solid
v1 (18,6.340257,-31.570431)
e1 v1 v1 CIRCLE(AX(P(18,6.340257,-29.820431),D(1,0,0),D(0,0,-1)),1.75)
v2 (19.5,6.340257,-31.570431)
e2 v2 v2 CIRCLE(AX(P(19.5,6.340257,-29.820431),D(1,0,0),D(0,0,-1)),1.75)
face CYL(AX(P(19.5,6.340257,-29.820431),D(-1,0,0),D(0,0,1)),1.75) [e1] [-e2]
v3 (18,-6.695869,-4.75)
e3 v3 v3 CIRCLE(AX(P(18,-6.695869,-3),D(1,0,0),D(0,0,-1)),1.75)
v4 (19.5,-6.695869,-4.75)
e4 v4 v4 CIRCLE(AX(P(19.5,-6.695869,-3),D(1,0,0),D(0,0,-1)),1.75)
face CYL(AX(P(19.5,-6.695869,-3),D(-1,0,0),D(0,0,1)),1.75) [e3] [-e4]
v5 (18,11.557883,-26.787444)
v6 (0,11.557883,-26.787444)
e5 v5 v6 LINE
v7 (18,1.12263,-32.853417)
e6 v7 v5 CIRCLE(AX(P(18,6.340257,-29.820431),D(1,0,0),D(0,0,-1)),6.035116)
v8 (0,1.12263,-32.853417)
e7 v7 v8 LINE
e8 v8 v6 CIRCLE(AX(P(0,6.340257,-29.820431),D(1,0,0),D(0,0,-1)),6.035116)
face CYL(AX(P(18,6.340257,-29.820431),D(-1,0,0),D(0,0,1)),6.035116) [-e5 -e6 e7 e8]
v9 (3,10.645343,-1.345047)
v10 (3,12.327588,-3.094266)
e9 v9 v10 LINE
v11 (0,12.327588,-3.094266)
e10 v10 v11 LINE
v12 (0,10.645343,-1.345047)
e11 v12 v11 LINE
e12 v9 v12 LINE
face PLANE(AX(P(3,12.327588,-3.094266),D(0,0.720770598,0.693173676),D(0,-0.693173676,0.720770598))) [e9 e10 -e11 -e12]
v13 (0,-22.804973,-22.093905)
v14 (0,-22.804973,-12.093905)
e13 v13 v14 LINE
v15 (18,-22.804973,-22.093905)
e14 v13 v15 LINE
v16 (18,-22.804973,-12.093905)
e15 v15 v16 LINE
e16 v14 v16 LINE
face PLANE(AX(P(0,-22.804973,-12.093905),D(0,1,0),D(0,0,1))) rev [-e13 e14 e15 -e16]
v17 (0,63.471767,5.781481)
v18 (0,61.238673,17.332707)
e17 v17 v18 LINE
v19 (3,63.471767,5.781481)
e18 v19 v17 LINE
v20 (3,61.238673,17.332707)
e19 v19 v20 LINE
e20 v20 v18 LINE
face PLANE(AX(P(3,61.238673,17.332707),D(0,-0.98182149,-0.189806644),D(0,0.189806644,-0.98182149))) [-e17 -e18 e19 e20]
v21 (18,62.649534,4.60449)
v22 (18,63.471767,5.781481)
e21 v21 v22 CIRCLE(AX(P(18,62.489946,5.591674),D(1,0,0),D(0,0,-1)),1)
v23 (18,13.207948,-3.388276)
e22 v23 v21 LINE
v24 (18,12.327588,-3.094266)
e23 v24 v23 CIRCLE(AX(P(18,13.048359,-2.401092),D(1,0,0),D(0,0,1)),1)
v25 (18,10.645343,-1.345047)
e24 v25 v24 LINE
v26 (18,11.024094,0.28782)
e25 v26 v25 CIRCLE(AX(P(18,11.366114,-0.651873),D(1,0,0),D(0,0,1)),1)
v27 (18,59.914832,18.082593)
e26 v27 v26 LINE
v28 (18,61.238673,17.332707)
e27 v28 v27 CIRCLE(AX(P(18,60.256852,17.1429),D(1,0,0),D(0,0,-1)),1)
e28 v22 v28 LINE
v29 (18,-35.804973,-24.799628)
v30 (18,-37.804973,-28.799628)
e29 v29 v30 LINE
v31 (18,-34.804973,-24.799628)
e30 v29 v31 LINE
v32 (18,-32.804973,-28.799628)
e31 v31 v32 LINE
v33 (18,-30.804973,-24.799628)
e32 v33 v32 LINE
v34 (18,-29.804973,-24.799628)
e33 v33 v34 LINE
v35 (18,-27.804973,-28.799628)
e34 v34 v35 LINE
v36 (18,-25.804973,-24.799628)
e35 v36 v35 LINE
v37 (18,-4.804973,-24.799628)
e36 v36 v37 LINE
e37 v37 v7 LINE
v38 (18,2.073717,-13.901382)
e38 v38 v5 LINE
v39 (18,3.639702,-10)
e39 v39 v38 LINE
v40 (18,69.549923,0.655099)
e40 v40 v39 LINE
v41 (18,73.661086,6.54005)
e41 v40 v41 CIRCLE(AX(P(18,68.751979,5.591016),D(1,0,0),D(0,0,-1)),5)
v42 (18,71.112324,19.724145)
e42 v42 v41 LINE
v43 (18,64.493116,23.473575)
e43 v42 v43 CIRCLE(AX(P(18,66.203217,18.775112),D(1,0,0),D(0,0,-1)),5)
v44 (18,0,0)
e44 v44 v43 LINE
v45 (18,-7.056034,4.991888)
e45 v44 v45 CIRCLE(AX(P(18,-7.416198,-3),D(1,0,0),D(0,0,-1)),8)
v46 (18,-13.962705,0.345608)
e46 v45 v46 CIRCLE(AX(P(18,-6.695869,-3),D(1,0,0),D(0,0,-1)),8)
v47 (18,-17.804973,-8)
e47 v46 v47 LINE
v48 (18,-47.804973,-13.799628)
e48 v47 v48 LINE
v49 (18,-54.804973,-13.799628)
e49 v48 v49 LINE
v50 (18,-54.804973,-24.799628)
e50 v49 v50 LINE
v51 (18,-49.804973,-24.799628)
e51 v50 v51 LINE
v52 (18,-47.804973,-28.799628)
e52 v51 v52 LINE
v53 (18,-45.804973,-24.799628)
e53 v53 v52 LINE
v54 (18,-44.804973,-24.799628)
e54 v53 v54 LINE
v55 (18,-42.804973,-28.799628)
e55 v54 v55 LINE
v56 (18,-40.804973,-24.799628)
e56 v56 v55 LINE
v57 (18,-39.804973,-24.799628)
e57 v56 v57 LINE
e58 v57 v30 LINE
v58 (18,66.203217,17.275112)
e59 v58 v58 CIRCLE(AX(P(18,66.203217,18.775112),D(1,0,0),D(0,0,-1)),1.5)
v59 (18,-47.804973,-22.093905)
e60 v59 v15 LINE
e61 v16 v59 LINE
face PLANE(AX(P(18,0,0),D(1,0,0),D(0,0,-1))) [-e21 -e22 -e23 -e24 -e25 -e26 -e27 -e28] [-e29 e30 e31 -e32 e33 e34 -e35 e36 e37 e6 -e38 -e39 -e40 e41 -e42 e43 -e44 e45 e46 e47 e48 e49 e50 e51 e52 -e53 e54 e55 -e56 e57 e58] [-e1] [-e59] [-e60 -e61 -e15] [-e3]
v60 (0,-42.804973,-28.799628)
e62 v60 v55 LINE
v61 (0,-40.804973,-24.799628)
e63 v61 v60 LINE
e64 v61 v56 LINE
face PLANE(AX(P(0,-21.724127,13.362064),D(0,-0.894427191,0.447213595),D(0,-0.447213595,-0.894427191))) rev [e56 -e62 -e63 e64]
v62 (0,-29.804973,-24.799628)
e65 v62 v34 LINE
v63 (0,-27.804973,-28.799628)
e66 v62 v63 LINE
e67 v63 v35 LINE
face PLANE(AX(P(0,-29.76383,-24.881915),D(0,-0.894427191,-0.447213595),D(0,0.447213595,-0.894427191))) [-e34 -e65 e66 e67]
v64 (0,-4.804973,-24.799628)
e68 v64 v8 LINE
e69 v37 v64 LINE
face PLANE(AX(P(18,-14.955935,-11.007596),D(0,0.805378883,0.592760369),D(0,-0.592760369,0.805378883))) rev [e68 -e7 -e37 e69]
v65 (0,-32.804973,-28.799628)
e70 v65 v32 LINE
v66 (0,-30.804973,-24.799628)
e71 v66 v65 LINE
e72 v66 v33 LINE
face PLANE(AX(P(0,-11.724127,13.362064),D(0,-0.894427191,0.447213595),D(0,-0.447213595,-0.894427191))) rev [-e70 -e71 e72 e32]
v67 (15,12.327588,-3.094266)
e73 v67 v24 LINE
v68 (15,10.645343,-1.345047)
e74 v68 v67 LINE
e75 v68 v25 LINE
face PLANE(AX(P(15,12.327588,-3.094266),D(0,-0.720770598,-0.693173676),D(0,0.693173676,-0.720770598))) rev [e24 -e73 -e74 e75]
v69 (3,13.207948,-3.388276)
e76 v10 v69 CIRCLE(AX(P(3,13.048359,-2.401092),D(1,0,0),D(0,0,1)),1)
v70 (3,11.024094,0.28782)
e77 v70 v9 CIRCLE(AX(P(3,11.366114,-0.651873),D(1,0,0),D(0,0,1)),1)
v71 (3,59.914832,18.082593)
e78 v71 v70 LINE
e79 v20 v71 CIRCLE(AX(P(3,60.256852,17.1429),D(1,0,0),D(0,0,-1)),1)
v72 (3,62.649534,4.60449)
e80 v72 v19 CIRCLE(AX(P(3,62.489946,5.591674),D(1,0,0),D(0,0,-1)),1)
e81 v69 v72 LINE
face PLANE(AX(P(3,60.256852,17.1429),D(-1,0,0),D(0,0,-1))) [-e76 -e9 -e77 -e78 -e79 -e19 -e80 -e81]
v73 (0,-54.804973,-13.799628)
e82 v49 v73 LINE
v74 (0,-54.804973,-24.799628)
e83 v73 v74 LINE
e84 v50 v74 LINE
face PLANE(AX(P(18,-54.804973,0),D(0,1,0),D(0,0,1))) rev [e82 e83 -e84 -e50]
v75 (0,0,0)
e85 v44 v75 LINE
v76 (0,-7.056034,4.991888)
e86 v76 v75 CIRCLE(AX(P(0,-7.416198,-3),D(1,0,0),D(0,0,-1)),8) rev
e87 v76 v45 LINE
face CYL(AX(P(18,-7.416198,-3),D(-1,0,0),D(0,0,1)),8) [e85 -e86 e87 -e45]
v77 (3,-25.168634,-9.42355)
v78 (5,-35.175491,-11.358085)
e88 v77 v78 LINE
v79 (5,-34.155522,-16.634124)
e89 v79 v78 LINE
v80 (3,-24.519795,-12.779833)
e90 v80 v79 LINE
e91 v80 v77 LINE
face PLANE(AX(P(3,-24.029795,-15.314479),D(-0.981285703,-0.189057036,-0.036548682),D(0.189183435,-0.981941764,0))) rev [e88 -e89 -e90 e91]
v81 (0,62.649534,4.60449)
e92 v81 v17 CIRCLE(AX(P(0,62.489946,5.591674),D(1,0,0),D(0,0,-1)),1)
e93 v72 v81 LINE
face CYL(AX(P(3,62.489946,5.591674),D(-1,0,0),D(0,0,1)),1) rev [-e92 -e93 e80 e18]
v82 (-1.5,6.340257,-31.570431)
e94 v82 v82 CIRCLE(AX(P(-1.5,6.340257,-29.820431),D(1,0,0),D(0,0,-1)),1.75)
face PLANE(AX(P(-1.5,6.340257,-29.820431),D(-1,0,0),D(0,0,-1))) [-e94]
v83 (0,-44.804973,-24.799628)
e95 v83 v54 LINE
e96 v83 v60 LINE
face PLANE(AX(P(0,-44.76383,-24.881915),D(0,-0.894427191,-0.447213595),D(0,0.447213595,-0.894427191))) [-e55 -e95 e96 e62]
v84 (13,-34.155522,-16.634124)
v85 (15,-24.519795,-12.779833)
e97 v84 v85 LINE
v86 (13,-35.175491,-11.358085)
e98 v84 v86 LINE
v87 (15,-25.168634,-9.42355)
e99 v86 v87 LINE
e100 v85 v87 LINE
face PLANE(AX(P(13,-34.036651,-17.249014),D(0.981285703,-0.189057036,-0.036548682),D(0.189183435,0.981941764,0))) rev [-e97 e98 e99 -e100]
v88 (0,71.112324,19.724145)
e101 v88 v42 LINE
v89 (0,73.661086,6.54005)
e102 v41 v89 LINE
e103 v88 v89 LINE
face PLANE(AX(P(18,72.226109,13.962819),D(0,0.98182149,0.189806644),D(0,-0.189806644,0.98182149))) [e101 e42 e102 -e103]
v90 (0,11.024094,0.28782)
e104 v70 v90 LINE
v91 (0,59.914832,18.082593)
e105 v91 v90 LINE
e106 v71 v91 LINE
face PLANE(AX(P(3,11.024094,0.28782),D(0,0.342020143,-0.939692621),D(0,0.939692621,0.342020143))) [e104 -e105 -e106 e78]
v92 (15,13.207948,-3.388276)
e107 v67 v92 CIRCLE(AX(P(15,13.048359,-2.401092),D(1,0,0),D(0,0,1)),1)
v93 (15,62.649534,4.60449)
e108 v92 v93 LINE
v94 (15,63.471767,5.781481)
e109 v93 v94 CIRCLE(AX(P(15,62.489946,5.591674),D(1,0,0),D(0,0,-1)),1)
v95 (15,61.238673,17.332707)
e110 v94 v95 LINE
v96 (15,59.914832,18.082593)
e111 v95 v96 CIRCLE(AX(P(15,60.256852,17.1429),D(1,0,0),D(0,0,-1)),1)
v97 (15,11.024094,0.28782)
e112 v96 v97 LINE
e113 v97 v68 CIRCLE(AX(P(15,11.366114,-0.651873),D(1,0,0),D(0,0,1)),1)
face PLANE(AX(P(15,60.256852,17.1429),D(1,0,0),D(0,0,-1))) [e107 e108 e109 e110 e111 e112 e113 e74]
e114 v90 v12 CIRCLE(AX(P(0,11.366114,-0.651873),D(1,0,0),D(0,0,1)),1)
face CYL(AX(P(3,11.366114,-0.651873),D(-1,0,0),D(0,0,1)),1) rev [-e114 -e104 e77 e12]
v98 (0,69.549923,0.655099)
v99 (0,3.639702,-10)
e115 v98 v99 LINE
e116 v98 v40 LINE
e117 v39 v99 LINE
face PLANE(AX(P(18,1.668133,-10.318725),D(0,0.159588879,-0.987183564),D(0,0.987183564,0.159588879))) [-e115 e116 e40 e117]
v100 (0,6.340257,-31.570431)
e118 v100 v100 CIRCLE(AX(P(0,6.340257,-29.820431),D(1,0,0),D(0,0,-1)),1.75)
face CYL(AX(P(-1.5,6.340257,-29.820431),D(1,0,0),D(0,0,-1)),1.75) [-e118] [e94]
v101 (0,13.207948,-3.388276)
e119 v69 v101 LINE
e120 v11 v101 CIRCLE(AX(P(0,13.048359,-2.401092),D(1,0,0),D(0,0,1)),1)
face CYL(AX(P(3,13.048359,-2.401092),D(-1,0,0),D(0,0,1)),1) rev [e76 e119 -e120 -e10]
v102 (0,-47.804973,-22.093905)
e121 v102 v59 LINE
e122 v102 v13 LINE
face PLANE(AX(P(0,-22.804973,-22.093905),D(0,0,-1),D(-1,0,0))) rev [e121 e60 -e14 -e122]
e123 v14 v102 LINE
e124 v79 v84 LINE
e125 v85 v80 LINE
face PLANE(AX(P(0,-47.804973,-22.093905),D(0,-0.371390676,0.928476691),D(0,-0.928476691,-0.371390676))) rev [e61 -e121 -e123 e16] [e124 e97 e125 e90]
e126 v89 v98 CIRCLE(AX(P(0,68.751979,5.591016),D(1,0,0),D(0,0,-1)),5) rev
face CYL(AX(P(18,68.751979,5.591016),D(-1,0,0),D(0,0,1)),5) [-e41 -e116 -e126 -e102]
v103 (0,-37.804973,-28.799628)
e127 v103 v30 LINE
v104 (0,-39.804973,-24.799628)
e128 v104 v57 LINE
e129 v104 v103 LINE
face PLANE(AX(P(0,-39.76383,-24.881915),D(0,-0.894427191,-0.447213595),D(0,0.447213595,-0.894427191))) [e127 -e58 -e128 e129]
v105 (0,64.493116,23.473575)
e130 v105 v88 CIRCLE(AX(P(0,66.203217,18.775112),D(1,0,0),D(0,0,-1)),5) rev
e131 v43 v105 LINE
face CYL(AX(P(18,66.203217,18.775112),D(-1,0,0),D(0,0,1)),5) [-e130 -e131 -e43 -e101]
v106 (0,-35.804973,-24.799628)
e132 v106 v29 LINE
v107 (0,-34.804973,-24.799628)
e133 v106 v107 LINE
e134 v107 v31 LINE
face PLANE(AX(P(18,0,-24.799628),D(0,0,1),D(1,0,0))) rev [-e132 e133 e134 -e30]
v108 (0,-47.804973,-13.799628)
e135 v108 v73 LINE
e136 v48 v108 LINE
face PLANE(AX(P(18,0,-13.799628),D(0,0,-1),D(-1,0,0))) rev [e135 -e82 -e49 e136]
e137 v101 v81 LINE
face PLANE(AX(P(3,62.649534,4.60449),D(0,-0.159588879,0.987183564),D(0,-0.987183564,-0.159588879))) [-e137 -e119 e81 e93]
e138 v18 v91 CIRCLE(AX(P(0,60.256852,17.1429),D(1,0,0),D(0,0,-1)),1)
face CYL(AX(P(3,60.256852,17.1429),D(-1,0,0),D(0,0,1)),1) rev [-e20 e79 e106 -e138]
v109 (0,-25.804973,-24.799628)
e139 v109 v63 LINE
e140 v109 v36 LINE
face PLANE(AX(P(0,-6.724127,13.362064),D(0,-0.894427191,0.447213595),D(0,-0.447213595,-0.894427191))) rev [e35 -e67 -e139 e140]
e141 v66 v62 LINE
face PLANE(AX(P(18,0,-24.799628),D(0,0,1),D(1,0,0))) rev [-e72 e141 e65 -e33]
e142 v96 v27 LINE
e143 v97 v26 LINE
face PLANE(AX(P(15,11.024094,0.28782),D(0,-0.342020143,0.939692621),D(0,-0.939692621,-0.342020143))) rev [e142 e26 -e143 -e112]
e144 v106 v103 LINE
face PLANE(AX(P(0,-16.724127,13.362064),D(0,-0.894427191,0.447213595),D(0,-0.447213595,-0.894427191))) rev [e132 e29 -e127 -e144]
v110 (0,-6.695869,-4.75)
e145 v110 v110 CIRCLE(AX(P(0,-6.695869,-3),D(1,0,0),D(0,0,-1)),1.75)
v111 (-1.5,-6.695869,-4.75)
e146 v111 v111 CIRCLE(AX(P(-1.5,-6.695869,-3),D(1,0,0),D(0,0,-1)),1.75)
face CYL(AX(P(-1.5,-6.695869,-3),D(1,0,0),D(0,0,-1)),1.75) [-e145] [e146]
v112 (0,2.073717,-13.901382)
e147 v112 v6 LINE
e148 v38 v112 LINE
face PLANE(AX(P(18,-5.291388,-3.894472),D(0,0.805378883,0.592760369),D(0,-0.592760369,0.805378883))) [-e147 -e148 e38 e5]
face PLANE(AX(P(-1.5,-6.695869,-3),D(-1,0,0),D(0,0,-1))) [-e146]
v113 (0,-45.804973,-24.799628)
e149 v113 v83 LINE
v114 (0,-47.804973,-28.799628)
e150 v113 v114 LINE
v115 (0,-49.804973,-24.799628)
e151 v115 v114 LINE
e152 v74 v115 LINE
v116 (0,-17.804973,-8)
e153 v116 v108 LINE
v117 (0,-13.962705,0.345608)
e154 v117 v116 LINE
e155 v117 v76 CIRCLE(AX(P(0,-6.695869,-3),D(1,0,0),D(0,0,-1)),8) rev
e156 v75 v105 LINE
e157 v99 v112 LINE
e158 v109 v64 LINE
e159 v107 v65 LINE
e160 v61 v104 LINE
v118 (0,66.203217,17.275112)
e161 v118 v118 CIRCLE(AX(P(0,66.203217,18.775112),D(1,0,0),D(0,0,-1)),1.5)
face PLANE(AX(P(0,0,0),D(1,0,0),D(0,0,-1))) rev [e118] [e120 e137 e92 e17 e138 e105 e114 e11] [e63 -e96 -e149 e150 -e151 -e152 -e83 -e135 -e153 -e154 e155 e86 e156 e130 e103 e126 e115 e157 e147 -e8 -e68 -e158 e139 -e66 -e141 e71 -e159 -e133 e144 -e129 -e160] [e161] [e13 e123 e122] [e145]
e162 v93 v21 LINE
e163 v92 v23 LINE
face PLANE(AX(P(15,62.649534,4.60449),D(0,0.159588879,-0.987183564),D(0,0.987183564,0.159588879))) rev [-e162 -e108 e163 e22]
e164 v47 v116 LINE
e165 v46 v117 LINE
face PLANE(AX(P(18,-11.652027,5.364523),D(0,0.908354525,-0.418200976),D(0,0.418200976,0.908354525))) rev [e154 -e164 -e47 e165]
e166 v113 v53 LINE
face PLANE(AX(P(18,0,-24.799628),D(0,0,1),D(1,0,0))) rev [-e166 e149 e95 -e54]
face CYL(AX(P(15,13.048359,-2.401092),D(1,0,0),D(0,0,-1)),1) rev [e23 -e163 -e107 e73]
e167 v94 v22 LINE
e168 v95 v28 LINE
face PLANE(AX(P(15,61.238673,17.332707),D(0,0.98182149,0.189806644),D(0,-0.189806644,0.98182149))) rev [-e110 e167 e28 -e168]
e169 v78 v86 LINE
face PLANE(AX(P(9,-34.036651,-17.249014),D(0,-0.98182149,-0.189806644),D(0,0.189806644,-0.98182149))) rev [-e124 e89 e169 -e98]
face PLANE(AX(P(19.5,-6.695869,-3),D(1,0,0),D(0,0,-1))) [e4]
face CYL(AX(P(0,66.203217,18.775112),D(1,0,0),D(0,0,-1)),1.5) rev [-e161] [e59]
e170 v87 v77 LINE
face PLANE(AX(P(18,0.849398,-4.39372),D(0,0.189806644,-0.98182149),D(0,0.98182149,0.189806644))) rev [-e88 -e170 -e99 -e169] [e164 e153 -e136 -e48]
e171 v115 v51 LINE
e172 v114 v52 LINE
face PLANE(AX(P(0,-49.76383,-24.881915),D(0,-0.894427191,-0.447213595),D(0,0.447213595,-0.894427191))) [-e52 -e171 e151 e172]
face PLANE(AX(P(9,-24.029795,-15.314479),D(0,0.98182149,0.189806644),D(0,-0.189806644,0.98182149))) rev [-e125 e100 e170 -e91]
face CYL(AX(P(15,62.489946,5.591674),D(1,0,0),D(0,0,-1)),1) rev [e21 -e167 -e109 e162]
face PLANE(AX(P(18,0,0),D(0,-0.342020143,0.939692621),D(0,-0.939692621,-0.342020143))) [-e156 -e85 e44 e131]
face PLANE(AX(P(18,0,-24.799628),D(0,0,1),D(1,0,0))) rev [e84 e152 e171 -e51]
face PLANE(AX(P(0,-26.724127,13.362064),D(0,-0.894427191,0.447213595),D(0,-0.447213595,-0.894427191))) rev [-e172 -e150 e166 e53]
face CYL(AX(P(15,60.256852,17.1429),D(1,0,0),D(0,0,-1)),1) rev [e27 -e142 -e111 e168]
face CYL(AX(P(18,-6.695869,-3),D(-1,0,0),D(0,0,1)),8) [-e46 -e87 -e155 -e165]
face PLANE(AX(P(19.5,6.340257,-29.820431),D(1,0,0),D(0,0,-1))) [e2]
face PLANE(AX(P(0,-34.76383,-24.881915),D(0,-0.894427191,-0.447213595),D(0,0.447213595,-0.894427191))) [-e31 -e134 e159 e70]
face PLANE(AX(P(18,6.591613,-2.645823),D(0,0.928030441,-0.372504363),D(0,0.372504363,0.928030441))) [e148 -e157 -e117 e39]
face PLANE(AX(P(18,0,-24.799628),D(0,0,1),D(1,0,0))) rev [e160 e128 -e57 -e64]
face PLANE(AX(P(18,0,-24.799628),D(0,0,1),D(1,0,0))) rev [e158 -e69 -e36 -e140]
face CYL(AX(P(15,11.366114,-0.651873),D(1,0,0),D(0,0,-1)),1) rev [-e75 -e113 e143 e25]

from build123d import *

# Parameters (mm, degrees)
BOSS_EXTRUDE1_DEPTH = 18
CUT_EXTRUDE1_DEPTH  = 18
BOSS_EXTRUDE2_DEPTH = 18
LPATTERN1_COUNT     = 5
LPATTERN1_PITCH     = 5
FILLET1_R           = 8
FILLET2_R           = 5
SKETCH4_R           = 1.5
CUT_EXTRUDE2_DEPTH  = 18
CUT_EXTRUDE3_DEPTH  = 6
SKETCH6_R           = 1.75
BOSS_EXTRUDE3_DEPTH = 1.5
SKETCH7_R           = 1.75
BOSS_EXTRUDE4_DEPTH = 1.5
CUT_EXTRUDE4_DEPTH  = 3


with BuildPart() as part:
    # Sketch1 → Boss-Extrude1 (new body)
    with BuildSketch(Plane(origin=(0, 0, 0), x_dir=(0, 0, -1), z_dir=(1, 0, 0))):
        with BuildLine():
            Line((24.799627928, -4.804973216), (32.853416759, 1.122630471))
            ThreePointArc((32.853416759, 1.122630471), (35.038056902, 9.373242879), (26.787444494, 11.557883023))
            Line((26.787444494, 11.557883023), (13.901382366, 2.073717122))
            Line((13.901382366, 2.073717122), (10, 3.639702343))
            Line((10, 3.639702343), (0, 0))
            Line((0, 0), (-5, -1.819851171))
            Line((-5, -1.819851171), (-5, -11.819851171))
            Line((-5, -11.819851171), (8, -17.804973216))
            Line((8, -17.804973216), (13.799627928, -47.804973216))
            Line((13.799627928, -47.804973216), (13.799627928, -54.804973216))
            Line((13.799627928, -54.804973216), (24.799627928, -54.804973216))
            Line((24.799627928, -54.804973216), (24.799627928, -4.804973216))
        make_face()
        Polygon((10, 3.639702343), (0, 0), (-25.477916399, 70), (-1.477916399, 74.639702343), align=None)
    extrude(amount=BOSS_EXTRUDE1_DEPTH)

    # Sketch2 → Cut-Extrude1 (cut)
    with BuildSketch(Plane(origin=(18, 0, 0), x_dir=(0, 0, -1), z_dir=(1, 0, 0))):
        Polygon((12.09390479, -22.804973216), (22.09390479, -22.804973216), (22.09390479, -47.804973216), align=None)
    extrude(amount=-CUT_EXTRUDE1_DEPTH, mode=Mode.SUBTRACT)

    # Sketch3 → Boss-Extrude2 (add)
    with BuildSketch(Plane(origin=(18, 0, 0), x_dir=(0, 0, -1), z_dir=(1, 0, 0))):
        Polygon((24.799627928, -47.804973216), (24.799627928, -49.804973216), (28.799627928, -47.804973216), align=None)
        Polygon((24.799627928, -47.804973216), (28.799627928, -47.804973216), (24.799627928, -45.804973216), align=None)
    boss_extrude2 = extrude(amount=-BOSS_EXTRUDE2_DEPTH)

    # LPattern1: Boss-Extrude2 ×5
    with Locations(*[(0, i * LPATTERN1_PITCH, 0) for i in range(1, LPATTERN1_COUNT)]):
        add(boss_extrude2)

    # Fillet1
    # the kernel refuses this fillet: 8 mm, written as the material it takes off along each edge
    with BuildSketch(Plane(origin=(-13.990868289, -1.819851171, 5), x_dir=(0, 0.34202014332566644, -0.9396926207859092), z_dir=(1, 0, 0))) as fillet1_piece_1:
        with BuildLine():
            CenterArc((5.603477455, -7.995007423), FILLET1_R, 92.024312837, 67.975687163)
            Line((-1.914063511, -5.258846276), (-2.06441433, -5.204123053))
            Line((-2.06441433, -5.204123053), (-0.150350819, 0.054723223))
            Line((-0.150350819, 0.054723223), (0, 0.16))
            ThreePointArc((0, 0.16), (2.660444431, 0.16), (5.315237091, 0.159900148))
            Line((5.315237091, 0.159900148), (5.320888862, 0))
        make_face()
    extrude(amount=45.981736579, mode=Mode.SUBTRACT)
    with BuildSketch(Plane(origin=(-12.809954869, -11.819851171, 5), x_dir=(0, 1, 0), z_dir=(1, 0, 0))) as fillet1_piece_2:
        with BuildLine():
            CenterArc((FILLET1_R * 0.640497743455, -FILLET1_R), FILLET1_R, 90, 65.278940391)
            Line((-FILLET1_R * 0.267856781688, -FILLET1_R * 0.581799023611), (-FILLET1_R * 0.286023872191, -FILLET1_R * 0.573435004083))
            Line((-FILLET1_R * 0.286023872191, -FILLET1_R * 0.573435004083), (-FILLET1_R * 0.0128099548691, FILLET1_R * 0.02))
            Line((-FILLET1_R * 0.0128099548691, FILLET1_R * 0.02), (FILLET1_R * 0.640497743455, FILLET1_R * 0.02))
            Line((FILLET1_R * 0.640497743455, FILLET1_R * 0.02), (FILLET1_R * 0.640497743455, 0))
        make_face()
    extrude(amount=43.619909738, mode=Mode.SUBTRACT)

    # Fillet2
    fillet2_edges = [part.edges().sort_by_distance(p)[0] for p in [
        (9, 70, 25.477916399),
        (9, 74.639702343, 1.477916399),
    ]]
    fillet(fillet2_edges, radius=FILLET2_R)

    # Sketch4 → Cut-Extrude2 (cut)
    with BuildSketch(Plane(origin=(18, 0, 0), x_dir=(0, 0, -1), z_dir=(1, 0, 0))):
        with Locations((-18.775111552, 66.203217038)):
            Circle(SKETCH4_R)
    extrude(amount=-CUT_EXTRUDE2_DEPTH, mode=Mode.SUBTRACT)

    # Sketch5 → Cut-Extrude3 (cut)
    with BuildSketch(Plane(origin=(0, 0.849397963, -4.393719597), x_dir=(1, 0, 0), z_dir=(0, -0.1898066444194718, 0.981821489749649))):
        Polygon((15, -26.499758484), (9, -26.499758484), (3, -26.499758484), (5, -36.691893202), (9, -36.691893202), (13, -36.691893202), align=None)
    extrude(amount=-CUT_EXTRUDE3_DEPTH, mode=Mode.SUBTRACT)

    # Sketch6 → Boss-Extrude3 (add)
    with BuildSketch(Plane(origin=(18, 0, 0), x_dir=(0, 0, -1), z_dir=(1, 0, 0))):
        with Locations((29.820430626, 6.340256747)):
            Circle(SKETCH6_R)
    boss_extrude3 = extrude(amount=BOSS_EXTRUDE3_DEPTH)

    # Sketch7 → Boss-Extrude4 (add)
    with BuildSketch(Plane(origin=(18, 0, 0), x_dir=(0, 0, -1), z_dir=(1, 0, 0))):
        with Locations((3, -6.695869224)):
            Circle(SKETCH7_R)
    boss_extrude4 = extrude(amount=BOSS_EXTRUDE4_DEPTH)

    # Sketch8 → Cut-Extrude4 (cut)
    with BuildSketch(Plane(origin=(18, 0, 0), x_dir=(0, 0, -1), z_dir=(1, 0, 0))):
        with BuildLine():
            Line((-17.332707084, 61.238673153), (-5.781480677, 63.471766995))
            ThreePointArc((-5.781480677, 63.471766995), (-5.018988164, 63.309720411), (-4.604490469, 62.649534384))
            Line((-4.604490469, 62.649534384), (3.388275701, 13.207947746))
            ThreePointArc((3.388275701, 13.207947746), (3.349595335, 12.731591312), (3.094265813, 12.327588269))
            Line((3.094265813, 12.327588269), (1.345046537, 10.645343239))
            ThreePointArc((1.345046537, 10.645343239), (0.425917391, 10.391976204), (-0.28781976, 11.024093693))
            Line((-0.28781976, 11.024093693), (-18.08259306, 59.914831519))
            ThreePointArc((-18.08259306, 59.914831519), (-18.013004637, 60.74971948), (-17.332707084, 61.238673153))
        make_face()
    cut_extrude4 = extrude(amount=-CUT_EXTRUDE4_DEPTH, mode=Mode.SUBTRACT)

    # Mirror1: Boss-Extrude3, Boss-Extrude4, Cut-Extrude4 across plane
    add(boss_extrude3.mirror(Plane(origin=(9, 0, 0), x_dir=(0, 0, 1), z_dir=(1, 0, 0))))
    add(boss_extrude4.mirror(Plane(origin=(9, 0, 0), x_dir=(0, 0, 1), z_dir=(1, 0, 0))))
    add(cut_extrude4.mirror(Plane(origin=(9, 0, 0), x_dir=(0, 0, 1), z_dir=(1, 0, 0))), mode=Mode.SUBTRACT)


solid = part.part
